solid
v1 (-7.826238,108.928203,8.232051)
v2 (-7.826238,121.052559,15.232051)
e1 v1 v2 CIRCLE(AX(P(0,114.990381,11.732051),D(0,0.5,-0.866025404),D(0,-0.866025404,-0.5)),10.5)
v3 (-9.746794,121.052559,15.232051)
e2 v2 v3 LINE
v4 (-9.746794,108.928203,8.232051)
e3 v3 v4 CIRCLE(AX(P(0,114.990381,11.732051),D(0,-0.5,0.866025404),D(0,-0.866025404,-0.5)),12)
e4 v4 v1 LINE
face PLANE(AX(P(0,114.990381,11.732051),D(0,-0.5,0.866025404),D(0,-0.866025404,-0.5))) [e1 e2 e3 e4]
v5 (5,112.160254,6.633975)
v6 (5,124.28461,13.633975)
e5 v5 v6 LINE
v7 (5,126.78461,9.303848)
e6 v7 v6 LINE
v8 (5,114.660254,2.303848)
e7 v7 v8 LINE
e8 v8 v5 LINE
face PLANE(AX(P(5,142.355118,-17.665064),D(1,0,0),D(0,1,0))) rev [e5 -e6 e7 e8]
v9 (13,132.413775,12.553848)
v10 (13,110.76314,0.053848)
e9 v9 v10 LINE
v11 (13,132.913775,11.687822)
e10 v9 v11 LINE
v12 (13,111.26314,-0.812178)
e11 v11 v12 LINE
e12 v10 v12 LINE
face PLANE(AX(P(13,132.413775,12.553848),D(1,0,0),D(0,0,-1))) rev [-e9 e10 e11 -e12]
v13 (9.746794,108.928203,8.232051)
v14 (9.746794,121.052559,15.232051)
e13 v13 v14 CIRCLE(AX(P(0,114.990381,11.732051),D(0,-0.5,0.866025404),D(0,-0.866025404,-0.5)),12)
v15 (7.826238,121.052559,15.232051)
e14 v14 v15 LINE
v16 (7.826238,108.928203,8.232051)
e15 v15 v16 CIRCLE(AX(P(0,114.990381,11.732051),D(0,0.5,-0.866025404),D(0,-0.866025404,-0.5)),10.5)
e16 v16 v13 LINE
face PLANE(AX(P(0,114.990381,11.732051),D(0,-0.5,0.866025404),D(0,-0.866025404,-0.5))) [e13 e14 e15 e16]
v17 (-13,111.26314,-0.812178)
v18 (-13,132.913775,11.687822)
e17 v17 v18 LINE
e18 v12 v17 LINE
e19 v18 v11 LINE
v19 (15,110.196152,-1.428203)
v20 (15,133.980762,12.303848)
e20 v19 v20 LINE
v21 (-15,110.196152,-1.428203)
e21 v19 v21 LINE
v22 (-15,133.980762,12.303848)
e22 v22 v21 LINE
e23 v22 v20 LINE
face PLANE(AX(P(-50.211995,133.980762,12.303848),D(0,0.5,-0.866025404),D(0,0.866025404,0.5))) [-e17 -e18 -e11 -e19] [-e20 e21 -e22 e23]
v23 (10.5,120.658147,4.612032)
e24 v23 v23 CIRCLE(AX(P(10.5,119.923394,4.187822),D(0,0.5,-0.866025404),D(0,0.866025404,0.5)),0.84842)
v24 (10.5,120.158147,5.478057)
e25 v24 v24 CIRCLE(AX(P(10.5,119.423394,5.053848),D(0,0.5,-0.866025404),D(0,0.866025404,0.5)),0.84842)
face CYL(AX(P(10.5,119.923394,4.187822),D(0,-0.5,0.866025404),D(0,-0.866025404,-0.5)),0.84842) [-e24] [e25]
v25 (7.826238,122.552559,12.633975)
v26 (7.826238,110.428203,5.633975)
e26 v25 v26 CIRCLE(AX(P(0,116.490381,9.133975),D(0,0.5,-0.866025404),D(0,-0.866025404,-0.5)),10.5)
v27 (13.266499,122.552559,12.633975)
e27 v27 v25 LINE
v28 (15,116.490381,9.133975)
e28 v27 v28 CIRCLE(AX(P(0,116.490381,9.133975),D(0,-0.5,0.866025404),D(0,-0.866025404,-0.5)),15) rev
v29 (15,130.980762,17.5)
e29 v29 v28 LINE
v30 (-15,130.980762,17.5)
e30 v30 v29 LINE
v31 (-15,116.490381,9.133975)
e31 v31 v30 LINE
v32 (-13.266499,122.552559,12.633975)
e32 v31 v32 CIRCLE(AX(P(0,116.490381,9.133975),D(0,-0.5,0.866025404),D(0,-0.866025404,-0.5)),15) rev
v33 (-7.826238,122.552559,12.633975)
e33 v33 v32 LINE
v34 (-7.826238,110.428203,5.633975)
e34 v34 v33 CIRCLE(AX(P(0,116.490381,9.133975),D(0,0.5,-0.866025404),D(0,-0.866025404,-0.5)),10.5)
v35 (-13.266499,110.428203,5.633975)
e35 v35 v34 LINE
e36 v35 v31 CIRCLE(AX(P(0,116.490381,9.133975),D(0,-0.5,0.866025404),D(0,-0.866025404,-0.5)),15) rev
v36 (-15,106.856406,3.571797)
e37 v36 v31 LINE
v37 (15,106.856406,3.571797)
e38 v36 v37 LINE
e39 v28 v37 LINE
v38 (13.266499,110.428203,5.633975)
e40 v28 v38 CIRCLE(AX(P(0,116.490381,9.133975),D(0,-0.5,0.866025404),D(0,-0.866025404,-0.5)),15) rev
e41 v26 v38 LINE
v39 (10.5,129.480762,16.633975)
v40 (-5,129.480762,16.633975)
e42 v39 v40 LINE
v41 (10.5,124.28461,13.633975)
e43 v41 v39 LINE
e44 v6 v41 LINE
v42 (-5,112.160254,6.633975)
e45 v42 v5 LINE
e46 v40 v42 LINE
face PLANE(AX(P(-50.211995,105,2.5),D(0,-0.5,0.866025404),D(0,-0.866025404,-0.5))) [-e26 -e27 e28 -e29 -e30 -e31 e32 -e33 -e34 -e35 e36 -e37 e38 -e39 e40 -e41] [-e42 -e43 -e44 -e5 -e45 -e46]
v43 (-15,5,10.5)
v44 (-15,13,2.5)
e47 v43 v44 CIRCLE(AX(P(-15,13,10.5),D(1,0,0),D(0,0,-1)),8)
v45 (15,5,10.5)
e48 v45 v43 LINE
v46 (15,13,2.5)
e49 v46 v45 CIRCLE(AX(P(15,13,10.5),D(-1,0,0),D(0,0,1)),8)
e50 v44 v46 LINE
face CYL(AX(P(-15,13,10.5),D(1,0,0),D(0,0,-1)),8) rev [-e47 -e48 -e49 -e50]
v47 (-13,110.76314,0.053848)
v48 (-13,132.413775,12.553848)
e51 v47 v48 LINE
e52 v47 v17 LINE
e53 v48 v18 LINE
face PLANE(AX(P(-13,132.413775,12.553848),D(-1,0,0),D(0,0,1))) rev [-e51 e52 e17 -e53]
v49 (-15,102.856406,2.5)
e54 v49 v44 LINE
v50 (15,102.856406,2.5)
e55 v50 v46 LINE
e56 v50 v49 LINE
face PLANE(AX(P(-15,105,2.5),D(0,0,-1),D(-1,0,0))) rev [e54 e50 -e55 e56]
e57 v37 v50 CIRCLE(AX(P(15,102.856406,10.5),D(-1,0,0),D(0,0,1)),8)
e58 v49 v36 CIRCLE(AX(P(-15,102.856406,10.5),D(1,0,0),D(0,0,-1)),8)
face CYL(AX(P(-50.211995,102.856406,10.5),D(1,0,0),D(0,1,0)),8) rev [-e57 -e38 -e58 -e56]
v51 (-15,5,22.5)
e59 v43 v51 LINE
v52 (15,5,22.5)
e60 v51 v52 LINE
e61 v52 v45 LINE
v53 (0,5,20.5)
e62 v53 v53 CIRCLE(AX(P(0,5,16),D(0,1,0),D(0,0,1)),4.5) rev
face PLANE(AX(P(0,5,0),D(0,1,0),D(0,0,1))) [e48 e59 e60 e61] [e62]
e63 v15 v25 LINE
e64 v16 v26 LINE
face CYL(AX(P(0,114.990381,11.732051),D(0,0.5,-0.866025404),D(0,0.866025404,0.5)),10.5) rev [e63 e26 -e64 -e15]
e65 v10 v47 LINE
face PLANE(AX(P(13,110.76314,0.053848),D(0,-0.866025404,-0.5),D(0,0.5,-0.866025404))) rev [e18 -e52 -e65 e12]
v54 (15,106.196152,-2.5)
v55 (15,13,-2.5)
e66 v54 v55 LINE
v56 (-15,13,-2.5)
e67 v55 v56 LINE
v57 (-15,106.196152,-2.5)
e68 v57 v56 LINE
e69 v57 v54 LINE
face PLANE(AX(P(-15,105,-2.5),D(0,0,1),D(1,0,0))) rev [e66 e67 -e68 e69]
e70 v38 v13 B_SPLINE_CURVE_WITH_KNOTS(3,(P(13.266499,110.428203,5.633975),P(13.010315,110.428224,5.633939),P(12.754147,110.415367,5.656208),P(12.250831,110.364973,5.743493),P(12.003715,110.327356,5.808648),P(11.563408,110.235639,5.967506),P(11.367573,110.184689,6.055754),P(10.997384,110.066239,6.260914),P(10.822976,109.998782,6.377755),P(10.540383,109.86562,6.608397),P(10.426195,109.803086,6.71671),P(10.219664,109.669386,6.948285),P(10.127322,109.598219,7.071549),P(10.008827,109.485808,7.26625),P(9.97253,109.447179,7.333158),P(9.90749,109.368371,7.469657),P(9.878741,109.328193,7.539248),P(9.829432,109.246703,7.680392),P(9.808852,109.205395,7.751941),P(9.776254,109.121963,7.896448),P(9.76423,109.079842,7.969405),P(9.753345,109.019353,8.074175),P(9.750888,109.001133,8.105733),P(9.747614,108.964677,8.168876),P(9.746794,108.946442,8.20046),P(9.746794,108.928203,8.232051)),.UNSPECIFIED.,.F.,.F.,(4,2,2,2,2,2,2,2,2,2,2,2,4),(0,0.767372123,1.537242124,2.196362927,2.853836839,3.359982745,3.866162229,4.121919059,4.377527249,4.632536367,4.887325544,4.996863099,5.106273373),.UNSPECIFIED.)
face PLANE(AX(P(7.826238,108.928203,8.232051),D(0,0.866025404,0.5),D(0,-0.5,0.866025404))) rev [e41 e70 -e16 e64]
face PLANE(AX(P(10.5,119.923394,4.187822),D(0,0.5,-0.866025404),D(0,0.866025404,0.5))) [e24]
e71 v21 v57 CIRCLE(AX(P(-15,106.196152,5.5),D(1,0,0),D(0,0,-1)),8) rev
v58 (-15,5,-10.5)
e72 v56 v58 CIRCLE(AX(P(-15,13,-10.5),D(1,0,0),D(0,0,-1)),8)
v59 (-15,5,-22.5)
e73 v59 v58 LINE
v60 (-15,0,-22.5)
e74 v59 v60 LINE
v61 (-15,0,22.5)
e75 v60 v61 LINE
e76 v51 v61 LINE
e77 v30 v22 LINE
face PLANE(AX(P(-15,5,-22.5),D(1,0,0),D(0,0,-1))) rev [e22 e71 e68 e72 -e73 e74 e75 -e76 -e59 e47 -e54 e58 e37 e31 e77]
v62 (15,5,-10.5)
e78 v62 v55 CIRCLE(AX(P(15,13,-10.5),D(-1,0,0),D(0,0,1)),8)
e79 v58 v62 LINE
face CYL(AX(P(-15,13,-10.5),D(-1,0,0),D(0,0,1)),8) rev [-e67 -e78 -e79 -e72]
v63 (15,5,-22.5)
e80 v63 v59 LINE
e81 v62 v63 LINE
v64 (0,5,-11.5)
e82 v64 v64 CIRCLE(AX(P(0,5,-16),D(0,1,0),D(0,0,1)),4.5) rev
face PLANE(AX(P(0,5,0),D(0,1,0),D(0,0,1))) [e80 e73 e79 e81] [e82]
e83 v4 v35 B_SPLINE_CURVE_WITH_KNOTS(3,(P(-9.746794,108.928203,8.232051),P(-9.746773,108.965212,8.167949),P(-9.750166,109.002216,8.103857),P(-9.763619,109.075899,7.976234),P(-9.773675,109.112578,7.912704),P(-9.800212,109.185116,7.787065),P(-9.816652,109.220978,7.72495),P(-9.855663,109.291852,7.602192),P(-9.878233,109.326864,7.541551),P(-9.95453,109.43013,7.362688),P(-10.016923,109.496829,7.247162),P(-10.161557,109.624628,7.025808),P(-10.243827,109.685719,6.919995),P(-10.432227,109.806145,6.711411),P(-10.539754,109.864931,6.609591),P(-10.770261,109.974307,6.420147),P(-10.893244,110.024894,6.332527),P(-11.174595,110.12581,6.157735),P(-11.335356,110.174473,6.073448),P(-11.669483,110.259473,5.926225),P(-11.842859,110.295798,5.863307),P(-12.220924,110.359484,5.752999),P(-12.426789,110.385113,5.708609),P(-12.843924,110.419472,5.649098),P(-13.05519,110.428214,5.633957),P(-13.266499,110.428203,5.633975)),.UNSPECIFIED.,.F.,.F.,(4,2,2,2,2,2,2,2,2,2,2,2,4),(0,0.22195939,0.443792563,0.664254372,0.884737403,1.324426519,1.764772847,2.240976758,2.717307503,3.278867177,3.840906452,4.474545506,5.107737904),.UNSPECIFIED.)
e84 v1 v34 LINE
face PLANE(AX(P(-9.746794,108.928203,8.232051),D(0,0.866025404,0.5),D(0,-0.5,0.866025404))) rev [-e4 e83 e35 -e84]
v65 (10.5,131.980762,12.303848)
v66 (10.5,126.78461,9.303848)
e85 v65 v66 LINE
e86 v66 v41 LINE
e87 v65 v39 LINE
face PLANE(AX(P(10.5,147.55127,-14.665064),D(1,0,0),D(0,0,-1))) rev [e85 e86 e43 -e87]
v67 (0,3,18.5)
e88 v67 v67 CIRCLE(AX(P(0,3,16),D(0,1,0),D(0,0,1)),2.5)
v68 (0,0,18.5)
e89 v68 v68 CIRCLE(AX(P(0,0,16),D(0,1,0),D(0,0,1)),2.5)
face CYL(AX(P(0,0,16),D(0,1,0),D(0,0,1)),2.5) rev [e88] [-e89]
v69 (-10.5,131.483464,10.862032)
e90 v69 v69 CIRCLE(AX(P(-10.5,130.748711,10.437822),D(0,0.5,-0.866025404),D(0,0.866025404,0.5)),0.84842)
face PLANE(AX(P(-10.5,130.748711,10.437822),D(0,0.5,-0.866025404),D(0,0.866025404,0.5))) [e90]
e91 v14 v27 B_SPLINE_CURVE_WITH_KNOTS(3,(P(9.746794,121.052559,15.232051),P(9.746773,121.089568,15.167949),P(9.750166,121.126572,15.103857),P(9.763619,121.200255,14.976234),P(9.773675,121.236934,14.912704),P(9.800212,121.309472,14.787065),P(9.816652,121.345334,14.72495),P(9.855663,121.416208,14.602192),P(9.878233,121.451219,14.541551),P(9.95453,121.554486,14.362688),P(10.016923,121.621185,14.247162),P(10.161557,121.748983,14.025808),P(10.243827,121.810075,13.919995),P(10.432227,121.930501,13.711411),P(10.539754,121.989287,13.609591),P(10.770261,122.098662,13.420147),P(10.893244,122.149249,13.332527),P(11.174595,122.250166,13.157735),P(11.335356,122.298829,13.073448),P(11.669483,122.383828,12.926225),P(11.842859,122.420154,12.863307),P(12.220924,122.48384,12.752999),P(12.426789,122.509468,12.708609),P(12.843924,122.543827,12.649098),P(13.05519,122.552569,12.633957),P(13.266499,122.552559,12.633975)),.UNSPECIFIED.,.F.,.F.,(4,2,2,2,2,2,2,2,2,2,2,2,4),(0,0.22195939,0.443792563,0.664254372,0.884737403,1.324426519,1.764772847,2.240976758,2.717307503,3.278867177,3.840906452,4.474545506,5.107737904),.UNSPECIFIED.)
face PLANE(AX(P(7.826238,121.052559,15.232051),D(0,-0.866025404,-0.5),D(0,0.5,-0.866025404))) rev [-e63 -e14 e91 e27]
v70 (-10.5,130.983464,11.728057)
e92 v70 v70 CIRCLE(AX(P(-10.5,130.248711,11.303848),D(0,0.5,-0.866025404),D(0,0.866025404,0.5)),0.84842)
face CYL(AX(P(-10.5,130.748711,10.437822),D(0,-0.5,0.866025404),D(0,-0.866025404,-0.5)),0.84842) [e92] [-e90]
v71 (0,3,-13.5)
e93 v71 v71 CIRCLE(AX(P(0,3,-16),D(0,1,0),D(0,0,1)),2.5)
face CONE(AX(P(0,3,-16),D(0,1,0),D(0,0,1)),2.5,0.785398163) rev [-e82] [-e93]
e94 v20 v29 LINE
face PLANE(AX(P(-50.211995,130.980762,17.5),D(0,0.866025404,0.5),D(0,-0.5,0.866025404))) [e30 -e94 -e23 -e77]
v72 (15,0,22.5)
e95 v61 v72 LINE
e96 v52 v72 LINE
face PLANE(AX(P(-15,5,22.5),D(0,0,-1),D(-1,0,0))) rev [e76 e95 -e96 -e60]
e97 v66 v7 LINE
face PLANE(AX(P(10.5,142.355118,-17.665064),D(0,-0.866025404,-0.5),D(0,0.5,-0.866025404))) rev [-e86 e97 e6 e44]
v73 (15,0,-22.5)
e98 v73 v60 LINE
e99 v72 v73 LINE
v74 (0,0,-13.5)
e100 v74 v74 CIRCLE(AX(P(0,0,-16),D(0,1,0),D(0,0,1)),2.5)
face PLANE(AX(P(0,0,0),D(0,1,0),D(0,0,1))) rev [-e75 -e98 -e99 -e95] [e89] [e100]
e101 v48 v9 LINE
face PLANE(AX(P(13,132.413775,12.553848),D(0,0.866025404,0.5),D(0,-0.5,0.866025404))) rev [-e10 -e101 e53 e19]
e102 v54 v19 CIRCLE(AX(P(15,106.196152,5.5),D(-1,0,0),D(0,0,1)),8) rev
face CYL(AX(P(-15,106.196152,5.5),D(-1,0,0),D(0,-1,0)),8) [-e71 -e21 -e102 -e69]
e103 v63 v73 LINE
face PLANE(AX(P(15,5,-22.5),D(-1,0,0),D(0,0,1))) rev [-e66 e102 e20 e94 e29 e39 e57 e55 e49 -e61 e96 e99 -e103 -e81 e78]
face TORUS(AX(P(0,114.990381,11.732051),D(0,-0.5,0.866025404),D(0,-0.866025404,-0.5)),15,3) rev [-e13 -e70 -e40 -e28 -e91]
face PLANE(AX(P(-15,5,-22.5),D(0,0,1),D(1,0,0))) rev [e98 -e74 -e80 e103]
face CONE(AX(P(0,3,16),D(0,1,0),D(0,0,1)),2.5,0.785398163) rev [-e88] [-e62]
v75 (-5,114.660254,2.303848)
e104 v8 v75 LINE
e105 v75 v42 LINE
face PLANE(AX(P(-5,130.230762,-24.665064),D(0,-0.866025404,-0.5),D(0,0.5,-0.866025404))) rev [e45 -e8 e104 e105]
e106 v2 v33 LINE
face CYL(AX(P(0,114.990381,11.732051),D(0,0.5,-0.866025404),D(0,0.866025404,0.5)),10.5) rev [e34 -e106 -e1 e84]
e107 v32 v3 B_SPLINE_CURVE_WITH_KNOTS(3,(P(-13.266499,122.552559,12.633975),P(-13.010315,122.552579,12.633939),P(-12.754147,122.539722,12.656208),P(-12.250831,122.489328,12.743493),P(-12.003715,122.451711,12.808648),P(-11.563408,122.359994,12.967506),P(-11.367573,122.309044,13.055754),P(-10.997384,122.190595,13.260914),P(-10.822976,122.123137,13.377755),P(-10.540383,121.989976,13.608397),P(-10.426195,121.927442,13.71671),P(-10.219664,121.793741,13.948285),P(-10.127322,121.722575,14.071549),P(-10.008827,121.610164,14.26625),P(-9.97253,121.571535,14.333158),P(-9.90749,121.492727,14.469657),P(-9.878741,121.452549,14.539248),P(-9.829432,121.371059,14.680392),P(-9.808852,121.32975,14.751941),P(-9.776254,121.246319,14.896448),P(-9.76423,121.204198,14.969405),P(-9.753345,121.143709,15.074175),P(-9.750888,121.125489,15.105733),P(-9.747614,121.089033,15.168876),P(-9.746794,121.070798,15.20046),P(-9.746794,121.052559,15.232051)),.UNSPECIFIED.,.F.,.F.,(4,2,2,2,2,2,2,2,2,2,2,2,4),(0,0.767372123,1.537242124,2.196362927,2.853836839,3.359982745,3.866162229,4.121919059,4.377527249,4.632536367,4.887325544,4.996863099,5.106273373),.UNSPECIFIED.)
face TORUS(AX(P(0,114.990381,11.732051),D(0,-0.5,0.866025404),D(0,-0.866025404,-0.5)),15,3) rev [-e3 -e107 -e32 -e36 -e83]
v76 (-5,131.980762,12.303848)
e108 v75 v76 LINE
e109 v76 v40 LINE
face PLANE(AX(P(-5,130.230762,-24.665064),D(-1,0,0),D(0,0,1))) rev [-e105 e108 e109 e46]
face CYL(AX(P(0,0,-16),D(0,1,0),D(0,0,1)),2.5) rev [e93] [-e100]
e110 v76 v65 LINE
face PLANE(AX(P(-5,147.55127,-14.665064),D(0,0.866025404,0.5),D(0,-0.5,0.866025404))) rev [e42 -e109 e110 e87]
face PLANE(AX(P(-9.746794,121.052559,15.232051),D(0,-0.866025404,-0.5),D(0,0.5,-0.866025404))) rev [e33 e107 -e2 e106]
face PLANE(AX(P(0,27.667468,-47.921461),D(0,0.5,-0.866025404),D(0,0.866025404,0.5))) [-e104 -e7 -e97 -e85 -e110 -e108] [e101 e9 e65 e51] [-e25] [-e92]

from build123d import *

# Parameters (mm, degrees)
SKETCH1_W           = 30
SKETCH1_H           = 45
BOSS_EXTRUDE1_DEPTH = 5
SKETCH2_W           = 30
SKETCH2_H           = 5
BOSS_EXTRUDE2_DEPTH = 100
BOSS_EXTRUDE3_DEPTH = 30
FILLET1_R           = 8
SKETCH4_R           = 2.5
CUT_EXTRUDE1_DEPTH  = 132.785002923
CHAMFER1_SIZE       = 2
SKETCH5_W           = 26
SKETCH5_H           = 25
CUT_EXTRUDE2_DEPTH  = 1
BOSS_EXTRUDE5_DEPTH = 3
CUT_EXTRUDE3_DEPTH  = 129.19281303
SKETCH7_R           = 0.848419625
BOSS_EXTRUDE4_DEPTH = 1
FILLET2_R           = 3


with BuildPart() as part:
    # Sketch1 → Boss-Extrude1 (new body)
    with BuildSketch(Plane(origin=(0, 0, 0), x_dir=(1, 0, 0), z_dir=(0, 1, 0))):
        Rectangle(SKETCH1_W, SKETCH1_H)
    extrude(amount=BOSS_EXTRUDE1_DEPTH)

    # Sketch2 → Boss-Extrude2 (add)
    with BuildSketch(Plane(origin=(0, 5, 0), x_dir=(1, 0, 0), z_dir=(0, 1, 0))):
        Rectangle(SKETCH2_W, SKETCH2_H)
    extrude(amount=BOSS_EXTRUDE2_DEPTH)

    # Sketch3 → Boss-Extrude3 (add)
    with BuildSketch(Plane(origin=(15, 0, 0), x_dir=(0, 0, -1), z_dir=(1, 0, 0))):
        Polygon((-2.5, 105), (-17.5, 130.980762114), (-12.303847577, 133.980762114), (2.5, 108.339745962), (2.5, 105), align=None)
    extrude(amount=-BOSS_EXTRUDE3_DEPTH)

    # Fillet1
    fillet1_edges = [part.edges().sort_by_distance(p)[0] for p in [
        (0, 5, -2.5),
        (0, 5, 2.5),
        (0, 105, 2.5),
        (0, 108.339745962, -2.5),
    ]]
    fillet(fillet1_edges, radius=FILLET1_R)

    # Sketch4 → Cut-Extrude1 (cut, through all)
    with BuildSketch(Plane(origin=(0, 5, 0), x_dir=(1, 0, 0), z_dir=(0, 1, 0))):
        with Locations(Location((0, 16, 0), (0, 0, 270))):
            Circle(SKETCH4_R)
        with Locations(Location((0, -16, 0), (0, 0, 270))):
            Circle(SKETCH4_R)
    extrude(amount=-CUT_EXTRUDE1_DEPTH, mode=Mode.SUBTRACT)

    # Chamfer1
    chamfer1_edges = [part.edges().sort_by_distance(p)[0] for p in [
        (0, 5, -18.5),
        (0, 5, 13.5),
    ]]
    chamfer(chamfer1_edges, length=CHAMFER1_SIZE)

    # Sketch5 → Cut-Extrude2 (cut)
    with BuildSketch(Plane(origin=(0, 28.167468245, -48.787486121), x_dir=(1, 0, 0), z_dir=(0, 0.4999999999999981, -0.8660254037844397))):
        with Locations((0, -108.45061659)):
            Rectangle(SKETCH5_W, SKETCH5_H)
    extrude(amount=-CUT_EXTRUDE2_DEPTH, mode=Mode.SUBTRACT)

    # Sketch8 → Boss-Extrude5 (add)
    with BuildSketch(Plane(origin=(0, 25.167468245, -43.591333699), x_dir=(1, 0, 0), z_dir=(0, -0.49999999999999784, 0.8660254037844399))):
        with BuildLine():
            Line((-9.746794345, 112.45061659), (-7.826237921, 112.45061659))
            ThreePointArc((-7.826237921, 112.45061659), (-10.5, 105.45061659), (-7.826237921, 98.45061659))
            Line((-7.826237921, 98.45061659), (-9.746794345, 98.45061659))
            ThreePointArc((-9.746794345, 98.45061659), (-12, 105.45061659), (-9.746794345, 112.45061659))
        make_face()
        with BuildLine():
            Line((7.826237921, 98.45061659), (9.746794345, 98.45061659))
            ThreePointArc((9.746794345, 98.45061659), (12, 105.45061659), (9.746794345, 112.45061659))
            Line((9.746794345, 112.45061659), (7.826237921, 112.45061659))
            ThreePointArc((7.826237921, 112.45061659), (10.5, 105.45061659), (7.826237921, 98.45061659))
        make_face()
    extrude(amount=BOSS_EXTRUDE5_DEPTH)

    # Sketch6 → Cut-Extrude3 (cut, through all)
    with BuildSketch(Plane(origin=(0, 25.167468245, -43.591333699), x_dir=(1, 0, 0), z_dir=(0, -0.49999999999999784, 0.8660254037844399))):
        Polygon((-5, 100.45061659), (5, 100.45061659), (5, 114.45061659), (10.5, 114.45061659), (10.5, 120.45061659), (-5, 120.45061659), align=None)
    extrude(amount=-CUT_EXTRUDE3_DEPTH, mode=Mode.SUBTRACT)

    # Sketch7 → Boss-Extrude4 (add)
    with BuildSketch(Plane(origin=(0, 27.667468245, -47.921460718), x_dir=(1, 0, 0), z_dir=(0, 0.4999999999999983, -0.8660254037844397))):
        with Locations(Location((10.5, -105.95061659, 0), (0, 0, 270))):
            Circle(SKETCH7_R)
        with Locations(Location((-10.5, -118.45061659, 0), (0, 0, 270))):
            Circle(SKETCH7_R)
    extrude(amount=BOSS_EXTRUDE4_DEPTH)

    # Fillet2
    fillet2_edges = [part.edges().sort_by_distance(p)[0] for p in [
        (12, 116.490381057, 9.133974596),
        (-12, 116.490381057, 9.133974596),
    ]]
    fillet(fillet2_edges, radius=FILLET2_R - 0.0001)  # a hair under: the kernel refuses the full size


solid = part.part
